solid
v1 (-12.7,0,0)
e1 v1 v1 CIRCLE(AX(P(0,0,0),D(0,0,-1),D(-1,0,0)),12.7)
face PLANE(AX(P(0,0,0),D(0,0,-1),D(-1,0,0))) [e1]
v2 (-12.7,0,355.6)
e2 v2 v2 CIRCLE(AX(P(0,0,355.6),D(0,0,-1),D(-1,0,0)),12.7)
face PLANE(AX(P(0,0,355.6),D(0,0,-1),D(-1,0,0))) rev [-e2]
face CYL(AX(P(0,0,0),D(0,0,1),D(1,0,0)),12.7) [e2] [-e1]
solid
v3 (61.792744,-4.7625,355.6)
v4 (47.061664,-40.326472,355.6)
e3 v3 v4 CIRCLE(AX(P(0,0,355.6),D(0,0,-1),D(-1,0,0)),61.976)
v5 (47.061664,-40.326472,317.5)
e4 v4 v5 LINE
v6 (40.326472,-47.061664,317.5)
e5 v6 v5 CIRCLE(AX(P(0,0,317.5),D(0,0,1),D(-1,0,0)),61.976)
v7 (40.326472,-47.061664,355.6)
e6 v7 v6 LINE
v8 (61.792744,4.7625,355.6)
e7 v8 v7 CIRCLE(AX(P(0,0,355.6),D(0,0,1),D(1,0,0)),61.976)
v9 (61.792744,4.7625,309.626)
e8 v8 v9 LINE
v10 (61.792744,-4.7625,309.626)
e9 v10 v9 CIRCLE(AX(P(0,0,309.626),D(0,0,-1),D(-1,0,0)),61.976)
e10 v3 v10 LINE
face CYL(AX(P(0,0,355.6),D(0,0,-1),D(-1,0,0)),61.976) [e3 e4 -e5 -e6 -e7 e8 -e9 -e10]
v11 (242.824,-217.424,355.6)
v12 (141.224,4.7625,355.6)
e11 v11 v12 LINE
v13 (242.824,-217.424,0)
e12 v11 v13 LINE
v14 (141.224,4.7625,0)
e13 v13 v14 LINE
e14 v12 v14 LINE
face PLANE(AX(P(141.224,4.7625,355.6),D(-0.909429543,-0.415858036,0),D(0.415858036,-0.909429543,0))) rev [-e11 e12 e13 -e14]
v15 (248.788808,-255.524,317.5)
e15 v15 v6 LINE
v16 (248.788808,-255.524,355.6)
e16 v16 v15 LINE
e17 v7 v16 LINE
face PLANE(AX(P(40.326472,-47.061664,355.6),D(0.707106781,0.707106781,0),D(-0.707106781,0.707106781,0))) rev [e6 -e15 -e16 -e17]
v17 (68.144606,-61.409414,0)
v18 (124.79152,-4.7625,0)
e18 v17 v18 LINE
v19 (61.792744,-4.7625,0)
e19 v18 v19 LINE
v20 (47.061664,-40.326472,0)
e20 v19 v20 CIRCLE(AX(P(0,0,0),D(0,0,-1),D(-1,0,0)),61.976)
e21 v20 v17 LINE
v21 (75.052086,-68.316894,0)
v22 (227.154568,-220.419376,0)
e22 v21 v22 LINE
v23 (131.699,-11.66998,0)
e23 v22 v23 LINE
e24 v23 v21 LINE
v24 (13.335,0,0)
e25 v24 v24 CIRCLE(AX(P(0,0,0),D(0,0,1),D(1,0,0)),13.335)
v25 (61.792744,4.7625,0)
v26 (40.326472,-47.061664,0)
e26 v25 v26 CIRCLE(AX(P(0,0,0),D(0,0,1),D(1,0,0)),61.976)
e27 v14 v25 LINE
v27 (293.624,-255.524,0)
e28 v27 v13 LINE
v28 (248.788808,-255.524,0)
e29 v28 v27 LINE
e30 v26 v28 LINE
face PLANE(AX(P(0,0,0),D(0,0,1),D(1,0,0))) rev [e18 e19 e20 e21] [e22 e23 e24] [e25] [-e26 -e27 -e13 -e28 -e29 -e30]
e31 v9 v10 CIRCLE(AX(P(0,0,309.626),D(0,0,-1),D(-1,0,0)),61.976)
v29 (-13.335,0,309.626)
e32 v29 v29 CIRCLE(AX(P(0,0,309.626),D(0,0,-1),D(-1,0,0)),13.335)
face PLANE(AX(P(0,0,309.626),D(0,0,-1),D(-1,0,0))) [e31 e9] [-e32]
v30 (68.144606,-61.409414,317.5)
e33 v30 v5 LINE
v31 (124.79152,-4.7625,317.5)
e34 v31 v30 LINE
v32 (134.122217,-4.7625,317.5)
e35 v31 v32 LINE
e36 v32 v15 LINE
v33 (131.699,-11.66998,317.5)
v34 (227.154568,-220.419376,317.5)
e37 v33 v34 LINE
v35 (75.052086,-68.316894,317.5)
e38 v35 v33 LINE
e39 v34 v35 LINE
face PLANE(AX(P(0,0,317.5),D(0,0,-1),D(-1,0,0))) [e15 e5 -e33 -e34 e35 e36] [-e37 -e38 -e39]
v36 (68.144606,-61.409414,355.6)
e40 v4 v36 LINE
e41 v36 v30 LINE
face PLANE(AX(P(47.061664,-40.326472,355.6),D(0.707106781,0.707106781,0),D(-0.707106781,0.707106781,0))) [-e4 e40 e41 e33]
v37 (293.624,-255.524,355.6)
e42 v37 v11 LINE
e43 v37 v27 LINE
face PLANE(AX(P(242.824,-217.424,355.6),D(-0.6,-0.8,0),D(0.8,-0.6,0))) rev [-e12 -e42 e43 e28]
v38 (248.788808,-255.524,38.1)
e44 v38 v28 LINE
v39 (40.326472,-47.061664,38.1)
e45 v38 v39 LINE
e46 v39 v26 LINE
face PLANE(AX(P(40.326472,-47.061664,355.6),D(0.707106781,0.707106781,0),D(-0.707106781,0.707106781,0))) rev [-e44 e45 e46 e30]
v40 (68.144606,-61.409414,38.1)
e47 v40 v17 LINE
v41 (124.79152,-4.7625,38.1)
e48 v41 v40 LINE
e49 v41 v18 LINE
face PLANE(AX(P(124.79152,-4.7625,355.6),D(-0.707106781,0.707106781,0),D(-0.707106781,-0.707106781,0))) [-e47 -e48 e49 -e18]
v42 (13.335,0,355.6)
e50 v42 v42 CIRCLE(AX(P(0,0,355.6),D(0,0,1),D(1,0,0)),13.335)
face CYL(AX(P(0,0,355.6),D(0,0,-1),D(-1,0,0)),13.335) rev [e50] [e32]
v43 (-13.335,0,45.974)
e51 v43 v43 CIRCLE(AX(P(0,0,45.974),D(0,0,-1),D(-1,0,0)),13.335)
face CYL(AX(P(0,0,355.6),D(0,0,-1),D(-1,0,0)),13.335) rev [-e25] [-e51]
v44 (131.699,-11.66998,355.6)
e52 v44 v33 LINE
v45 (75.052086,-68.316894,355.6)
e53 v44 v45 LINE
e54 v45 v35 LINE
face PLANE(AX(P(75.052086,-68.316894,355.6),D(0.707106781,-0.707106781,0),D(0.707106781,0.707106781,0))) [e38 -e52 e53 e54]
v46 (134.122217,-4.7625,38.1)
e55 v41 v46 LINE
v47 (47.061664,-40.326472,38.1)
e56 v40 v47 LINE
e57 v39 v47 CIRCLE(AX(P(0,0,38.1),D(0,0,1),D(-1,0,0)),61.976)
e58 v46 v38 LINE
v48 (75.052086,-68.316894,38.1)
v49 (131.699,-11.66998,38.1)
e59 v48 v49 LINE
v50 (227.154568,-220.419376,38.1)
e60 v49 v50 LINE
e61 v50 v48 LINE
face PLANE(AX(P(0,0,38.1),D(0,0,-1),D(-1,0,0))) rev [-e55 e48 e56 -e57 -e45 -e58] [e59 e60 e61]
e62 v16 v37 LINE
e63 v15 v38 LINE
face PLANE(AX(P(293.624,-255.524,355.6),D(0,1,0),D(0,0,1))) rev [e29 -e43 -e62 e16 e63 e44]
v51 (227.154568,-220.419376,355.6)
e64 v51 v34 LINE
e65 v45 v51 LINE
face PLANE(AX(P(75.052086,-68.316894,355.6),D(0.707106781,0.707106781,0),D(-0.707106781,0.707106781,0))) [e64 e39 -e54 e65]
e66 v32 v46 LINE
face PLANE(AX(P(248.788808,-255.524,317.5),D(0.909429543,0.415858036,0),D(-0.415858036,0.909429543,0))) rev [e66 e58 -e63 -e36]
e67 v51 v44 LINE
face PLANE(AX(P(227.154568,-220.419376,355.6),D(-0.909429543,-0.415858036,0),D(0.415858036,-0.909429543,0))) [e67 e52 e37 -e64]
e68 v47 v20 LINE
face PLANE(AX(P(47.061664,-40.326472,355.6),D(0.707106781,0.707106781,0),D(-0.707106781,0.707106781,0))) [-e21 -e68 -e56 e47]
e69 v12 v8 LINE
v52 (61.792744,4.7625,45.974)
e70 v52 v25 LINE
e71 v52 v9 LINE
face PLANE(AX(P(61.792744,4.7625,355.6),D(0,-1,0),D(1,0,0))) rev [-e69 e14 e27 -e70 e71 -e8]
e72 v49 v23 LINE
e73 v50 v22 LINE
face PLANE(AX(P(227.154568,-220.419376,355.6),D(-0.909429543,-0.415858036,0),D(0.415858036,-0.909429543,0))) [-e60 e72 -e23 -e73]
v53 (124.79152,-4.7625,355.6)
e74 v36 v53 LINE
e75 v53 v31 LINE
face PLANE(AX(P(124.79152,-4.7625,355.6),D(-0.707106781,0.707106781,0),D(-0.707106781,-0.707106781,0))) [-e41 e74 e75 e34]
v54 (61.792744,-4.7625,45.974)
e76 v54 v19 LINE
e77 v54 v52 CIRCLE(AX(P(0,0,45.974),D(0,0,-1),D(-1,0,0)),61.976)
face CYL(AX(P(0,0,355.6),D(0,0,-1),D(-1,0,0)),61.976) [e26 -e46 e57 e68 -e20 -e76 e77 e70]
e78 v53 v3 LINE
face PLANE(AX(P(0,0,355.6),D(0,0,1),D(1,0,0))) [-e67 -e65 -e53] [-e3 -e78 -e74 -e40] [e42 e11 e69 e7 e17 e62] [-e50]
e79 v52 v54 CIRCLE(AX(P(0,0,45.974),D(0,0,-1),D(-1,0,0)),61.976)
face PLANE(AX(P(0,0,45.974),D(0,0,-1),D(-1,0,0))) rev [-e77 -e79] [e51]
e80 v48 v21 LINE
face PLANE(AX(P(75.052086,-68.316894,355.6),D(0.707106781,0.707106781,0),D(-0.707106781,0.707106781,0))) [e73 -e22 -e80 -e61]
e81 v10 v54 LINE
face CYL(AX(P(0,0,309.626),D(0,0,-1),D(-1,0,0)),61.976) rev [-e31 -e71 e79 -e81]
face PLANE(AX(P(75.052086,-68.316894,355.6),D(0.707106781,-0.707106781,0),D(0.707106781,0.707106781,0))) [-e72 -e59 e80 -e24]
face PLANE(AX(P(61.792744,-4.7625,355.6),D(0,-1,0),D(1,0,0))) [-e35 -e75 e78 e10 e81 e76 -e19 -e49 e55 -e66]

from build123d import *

# Parameters (mm, degrees)
SKETCH1_R           = 13.335
BOSS_EXTRUDE1_DEPTH = 355.6
SKETCH4_R           = 61.976
SKETCH4_R_2         = 13.335
CUT_EXTRUDE1_DEPTH  = 131.826
SKETCH5_R           = 12.7
BOSS_EXTRUDE3_DEPTH = 177.8
CUT_EXTRUDE2_START  = -139.7
CUT_EXTRUDE2_DEPTH  = 279.4


# Read off the part's stored shape, not the designer's step: Cut-Extrude2
with BuildPart() as part:
    # Sketch1 → Boss-Extrude1 (new body)
    with BuildSketch(Plane.XY):
        with BuildLine():
            Line((61.792743666, 4.7625), (141.224, 4.7625))
            Line((141.224, 4.7625), (242.824, -217.424))
            Line((242.824, -217.424), (293.624, -255.524))
            Line((293.624, -255.524), (248.788807909, -255.524))
            Line((248.788807909, -255.524), (40.326472029, -47.06166412))
            ThreePointArc((40.326472029, -47.06166412), (-57.258357907, 23.717188404), (61.792743666, 4.7625))
        make_face()
        Circle(SKETCH1_R, mode=Mode.SUBTRACT)
        Polygon((227.154568259, -220.419376168), (131.699, -11.669980332), (75.052086211, -68.316894121), align=None, mode=Mode.SUBTRACT)
        with BuildLine():
            Line((124.791519668, -4.7625), (68.144605879, -61.409413789))
            Line((68.144605879, -61.409413789), (47.06166412, -40.326472029))
            ThreePointArc((47.06166412, -40.326472029), (57.258357907, -23.717188404), (61.792743666, -4.7625))
            Line((61.792743666, -4.7625), (124.791519668, -4.7625))
        make_face(mode=Mode.SUBTRACT)
    extrude(amount=BOSS_EXTRUDE1_DEPTH)

    # Sketch4 → Cut-Extrude1 (cut, symmetric)
    with BuildSketch(Plane(origin=(0, 0, 177.8), x_dir=(-1, 0, 0), z_dir=(0, 0, -1))):
        Circle(SKETCH4_R)
        Circle(SKETCH4_R_2, mode=Mode.SUBTRACT)
    extrude(amount=CUT_EXTRUDE1_DEPTH, both=True, mode=Mode.SUBTRACT)

    # Cut-Extrude2 outline → Cut-Extrude2 (cut)
    with BuildSketch(Plane(origin=(0, 0, 177.8), x_dir=(-1, 0, 0), z_dir=(0, 0, -1)).offset(CUT_EXTRUDE2_START)):
        with BuildLine():
            Line((-124.791519668, -4.7625), (-134.122217455, -4.7625))
            Line((-134.122217455, -4.7625), (-248.788807909, -255.524))
            Line((-248.788807909, -255.524), (-40.326472029, -47.06166412))
            ThreePointArc((-40.326472029, -47.06166412), (-43.823649871, -43.823649871), (-47.06166412, -40.326472029))
            Line((-47.06166412, -40.326472029), (-68.144605879, -61.409413789))
            Line((-68.144605879, -61.409413789), (-124.791519668, -4.7625))
        make_face()
        Polygon((-131.699, -11.669980332), (-75.052086211, -68.316894121), (-227.154568259, -220.419376168), align=None, mode=Mode.SUBTRACT)
    extrude(amount=CUT_EXTRUDE2_DEPTH, mode=Mode.SUBTRACT)


with BuildPart() as body_2:
    # Sketch5 → Boss-Extrude3 (new, symmetric)
    with BuildSketch(Plane(origin=(0, 0, 177.8), x_dir=(-1, 0, 0), z_dir=(0, 0, -1))):
        Circle(SKETCH5_R)
    extrude(amount=BOSS_EXTRUDE3_DEPTH, both=True)


solid = Compound([part.part, body_2.part])
